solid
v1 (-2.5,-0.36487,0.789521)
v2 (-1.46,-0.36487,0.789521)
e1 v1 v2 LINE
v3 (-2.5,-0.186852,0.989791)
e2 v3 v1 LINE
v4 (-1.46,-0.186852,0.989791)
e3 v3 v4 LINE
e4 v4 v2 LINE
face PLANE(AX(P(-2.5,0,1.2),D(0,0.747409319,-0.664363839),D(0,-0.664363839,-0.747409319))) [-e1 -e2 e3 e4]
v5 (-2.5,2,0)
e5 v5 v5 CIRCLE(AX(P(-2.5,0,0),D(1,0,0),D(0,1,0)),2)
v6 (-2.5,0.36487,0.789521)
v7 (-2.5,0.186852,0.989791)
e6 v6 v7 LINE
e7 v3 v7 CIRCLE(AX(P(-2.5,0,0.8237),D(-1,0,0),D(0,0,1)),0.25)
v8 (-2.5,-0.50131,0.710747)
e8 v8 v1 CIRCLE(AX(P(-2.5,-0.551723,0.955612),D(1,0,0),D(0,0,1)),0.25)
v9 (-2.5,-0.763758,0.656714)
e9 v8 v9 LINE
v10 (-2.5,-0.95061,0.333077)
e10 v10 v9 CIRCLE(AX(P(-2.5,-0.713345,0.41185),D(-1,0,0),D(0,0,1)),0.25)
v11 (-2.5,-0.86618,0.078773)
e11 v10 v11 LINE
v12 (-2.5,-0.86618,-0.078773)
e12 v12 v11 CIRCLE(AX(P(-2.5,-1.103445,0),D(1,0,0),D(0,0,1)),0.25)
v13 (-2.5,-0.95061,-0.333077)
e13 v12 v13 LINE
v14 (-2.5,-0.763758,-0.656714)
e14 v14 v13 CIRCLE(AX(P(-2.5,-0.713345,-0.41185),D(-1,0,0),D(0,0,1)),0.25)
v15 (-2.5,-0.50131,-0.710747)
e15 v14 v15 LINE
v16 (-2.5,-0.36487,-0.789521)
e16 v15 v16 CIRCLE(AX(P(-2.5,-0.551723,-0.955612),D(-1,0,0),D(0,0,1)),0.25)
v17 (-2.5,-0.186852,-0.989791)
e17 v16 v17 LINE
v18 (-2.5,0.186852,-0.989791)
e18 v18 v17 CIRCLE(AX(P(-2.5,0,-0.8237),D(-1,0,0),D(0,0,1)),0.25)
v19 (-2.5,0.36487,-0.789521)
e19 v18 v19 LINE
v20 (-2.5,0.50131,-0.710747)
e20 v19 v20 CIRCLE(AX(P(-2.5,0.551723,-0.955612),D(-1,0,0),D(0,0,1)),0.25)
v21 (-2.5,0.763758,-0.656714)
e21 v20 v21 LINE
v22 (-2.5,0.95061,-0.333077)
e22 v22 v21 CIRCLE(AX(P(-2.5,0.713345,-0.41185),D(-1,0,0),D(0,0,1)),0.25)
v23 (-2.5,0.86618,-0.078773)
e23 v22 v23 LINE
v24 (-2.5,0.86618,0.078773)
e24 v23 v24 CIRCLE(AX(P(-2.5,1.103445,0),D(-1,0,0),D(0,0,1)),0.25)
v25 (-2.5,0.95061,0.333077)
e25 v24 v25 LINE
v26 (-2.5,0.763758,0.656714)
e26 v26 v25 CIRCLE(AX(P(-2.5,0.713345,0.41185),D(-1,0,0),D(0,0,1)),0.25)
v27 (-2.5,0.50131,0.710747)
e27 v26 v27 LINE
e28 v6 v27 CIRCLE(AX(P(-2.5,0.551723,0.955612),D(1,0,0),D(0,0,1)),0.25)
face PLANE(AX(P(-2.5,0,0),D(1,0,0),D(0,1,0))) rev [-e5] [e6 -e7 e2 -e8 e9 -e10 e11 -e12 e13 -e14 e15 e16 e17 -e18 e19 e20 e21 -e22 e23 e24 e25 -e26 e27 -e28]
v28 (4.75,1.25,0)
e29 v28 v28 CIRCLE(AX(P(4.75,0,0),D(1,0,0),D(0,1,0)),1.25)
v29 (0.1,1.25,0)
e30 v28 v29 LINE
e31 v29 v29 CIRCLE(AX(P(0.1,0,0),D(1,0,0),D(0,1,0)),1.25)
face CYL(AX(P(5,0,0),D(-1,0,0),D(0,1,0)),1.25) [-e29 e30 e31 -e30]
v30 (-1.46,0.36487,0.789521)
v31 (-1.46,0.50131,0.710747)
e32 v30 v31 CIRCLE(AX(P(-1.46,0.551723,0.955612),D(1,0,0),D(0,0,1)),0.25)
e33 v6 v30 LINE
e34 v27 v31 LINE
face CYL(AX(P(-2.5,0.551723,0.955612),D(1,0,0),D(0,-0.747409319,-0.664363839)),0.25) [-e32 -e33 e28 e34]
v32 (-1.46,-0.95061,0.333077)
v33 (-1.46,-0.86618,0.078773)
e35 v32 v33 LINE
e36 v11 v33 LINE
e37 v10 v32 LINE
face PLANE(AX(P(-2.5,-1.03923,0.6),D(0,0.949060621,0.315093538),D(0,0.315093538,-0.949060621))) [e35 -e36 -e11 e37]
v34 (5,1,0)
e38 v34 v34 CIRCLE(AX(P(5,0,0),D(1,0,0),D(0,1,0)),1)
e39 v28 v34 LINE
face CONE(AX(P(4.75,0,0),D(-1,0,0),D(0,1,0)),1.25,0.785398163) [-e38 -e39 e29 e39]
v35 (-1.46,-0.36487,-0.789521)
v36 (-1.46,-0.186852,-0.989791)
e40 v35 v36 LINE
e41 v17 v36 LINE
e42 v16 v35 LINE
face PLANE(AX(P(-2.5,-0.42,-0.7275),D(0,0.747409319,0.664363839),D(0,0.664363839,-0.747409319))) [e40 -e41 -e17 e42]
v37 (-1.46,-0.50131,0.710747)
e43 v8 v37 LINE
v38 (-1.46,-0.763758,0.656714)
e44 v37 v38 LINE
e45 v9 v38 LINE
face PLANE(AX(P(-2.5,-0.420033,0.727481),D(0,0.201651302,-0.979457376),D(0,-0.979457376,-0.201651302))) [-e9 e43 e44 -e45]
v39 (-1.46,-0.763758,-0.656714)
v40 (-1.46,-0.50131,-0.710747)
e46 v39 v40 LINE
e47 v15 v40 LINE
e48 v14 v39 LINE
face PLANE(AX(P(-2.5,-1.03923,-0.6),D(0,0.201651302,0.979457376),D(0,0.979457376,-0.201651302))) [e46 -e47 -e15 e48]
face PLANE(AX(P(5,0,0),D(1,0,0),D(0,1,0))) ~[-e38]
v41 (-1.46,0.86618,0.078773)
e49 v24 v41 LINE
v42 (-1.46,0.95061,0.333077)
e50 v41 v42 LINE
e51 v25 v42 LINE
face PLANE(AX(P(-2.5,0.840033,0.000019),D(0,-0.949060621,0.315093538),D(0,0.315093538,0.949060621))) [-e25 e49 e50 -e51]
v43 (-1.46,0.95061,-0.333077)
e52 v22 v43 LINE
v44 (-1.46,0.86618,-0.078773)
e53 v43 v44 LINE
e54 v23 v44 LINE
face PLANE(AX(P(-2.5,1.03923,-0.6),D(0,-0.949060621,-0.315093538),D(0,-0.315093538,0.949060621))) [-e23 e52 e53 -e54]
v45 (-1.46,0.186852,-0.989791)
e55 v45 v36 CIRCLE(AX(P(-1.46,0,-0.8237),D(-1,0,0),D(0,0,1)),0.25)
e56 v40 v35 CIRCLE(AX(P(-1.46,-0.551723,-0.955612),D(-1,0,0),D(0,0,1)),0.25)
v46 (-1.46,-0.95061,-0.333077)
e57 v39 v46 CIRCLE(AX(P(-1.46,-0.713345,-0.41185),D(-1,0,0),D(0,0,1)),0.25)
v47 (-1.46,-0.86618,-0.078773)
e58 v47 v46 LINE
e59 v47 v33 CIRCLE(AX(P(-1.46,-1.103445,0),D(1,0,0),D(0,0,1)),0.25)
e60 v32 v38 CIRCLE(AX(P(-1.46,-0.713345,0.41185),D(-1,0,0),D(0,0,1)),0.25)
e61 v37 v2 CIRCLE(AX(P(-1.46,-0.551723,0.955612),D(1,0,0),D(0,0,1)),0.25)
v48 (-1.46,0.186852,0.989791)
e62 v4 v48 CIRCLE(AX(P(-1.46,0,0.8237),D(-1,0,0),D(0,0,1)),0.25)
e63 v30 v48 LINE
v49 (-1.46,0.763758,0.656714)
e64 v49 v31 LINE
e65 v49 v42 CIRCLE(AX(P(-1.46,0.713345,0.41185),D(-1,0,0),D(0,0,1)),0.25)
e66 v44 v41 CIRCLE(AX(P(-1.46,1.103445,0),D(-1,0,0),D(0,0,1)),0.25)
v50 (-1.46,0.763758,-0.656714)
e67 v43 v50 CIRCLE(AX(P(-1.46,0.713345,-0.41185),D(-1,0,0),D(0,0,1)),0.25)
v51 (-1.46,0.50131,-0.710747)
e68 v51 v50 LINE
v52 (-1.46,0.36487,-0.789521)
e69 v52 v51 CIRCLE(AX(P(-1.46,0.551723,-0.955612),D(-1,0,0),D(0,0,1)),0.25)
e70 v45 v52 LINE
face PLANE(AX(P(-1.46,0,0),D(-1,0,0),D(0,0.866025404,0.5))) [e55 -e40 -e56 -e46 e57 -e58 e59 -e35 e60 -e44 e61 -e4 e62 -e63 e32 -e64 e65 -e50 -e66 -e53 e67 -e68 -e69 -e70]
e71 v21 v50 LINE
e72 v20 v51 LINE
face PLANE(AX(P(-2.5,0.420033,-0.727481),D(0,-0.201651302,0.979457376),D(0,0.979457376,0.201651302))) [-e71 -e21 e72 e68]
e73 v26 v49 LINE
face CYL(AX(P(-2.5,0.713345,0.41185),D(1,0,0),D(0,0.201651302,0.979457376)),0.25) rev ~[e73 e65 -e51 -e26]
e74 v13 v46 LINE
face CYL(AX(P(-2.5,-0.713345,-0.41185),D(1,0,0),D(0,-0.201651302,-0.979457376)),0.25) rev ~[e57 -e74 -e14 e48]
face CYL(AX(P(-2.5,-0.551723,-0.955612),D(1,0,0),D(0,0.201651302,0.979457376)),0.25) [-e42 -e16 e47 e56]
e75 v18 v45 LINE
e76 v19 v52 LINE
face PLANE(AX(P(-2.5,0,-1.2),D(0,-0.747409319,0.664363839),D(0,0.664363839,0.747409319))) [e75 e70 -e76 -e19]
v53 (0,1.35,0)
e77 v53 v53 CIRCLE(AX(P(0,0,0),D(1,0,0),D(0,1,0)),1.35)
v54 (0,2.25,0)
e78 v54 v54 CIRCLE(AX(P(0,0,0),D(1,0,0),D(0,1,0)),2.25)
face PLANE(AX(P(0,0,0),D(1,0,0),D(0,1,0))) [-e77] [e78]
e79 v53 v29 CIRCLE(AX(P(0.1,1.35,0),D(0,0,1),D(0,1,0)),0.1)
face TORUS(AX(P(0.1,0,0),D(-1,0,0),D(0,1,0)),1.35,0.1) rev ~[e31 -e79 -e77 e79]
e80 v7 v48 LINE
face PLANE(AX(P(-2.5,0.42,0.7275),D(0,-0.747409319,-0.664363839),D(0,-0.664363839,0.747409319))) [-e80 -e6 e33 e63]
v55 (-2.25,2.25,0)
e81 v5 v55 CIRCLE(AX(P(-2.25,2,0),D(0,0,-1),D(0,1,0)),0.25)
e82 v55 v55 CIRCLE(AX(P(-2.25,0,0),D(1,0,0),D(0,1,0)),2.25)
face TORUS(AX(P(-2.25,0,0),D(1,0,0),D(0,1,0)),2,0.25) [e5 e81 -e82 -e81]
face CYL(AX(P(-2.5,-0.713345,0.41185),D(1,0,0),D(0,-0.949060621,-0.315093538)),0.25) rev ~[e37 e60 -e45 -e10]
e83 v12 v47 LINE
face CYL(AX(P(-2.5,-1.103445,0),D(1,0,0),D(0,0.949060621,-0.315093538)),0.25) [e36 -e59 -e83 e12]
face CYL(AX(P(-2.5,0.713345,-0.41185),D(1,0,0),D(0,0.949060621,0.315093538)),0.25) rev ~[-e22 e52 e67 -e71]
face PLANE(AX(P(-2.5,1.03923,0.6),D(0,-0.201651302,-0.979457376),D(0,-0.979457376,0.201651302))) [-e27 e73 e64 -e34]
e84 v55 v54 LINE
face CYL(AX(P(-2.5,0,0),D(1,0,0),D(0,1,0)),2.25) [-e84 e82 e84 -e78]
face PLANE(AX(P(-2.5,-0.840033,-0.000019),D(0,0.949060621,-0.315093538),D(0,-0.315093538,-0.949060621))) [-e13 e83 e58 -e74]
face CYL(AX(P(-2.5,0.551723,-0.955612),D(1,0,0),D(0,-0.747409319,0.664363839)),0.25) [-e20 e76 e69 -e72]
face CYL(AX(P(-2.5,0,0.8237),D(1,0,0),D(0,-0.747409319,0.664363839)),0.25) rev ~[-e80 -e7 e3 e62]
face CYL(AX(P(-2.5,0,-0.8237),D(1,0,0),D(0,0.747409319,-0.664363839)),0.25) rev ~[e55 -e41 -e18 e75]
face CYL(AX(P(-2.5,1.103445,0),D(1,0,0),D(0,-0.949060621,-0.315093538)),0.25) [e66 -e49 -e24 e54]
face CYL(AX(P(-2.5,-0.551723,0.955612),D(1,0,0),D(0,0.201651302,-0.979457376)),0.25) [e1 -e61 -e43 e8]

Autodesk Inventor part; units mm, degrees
ref_plane "YZ Plane" through (0, 0, 0) normal (1, 0, 0) x (0, 1, 0)
ref_plane "XZ Plane" through (0, 0, 0) normal (0, 1, 0) x (-1, 0, 0)
ref_plane "XY Plane" through (0, 0, 0) normal (0, 0, 1) x (1, 0, 0)
sketch "Sketch1" plane through (0, 0, 0) normal (0, 0, 1) x (1, 0, 0)
  line L0 (0, 0) -> (5, 0)
  line L1 (5, 0) -> (5, 1.25)
  line L2 (5, 1.25) -> (0, 1.25)
  line L3 (0, 1.25) -> (0, 0)
  line L4 (0, 0) -> (-2.5, 0)
  line L5 (-2.5, 0) -> (-2.5, 2.25)
  line L6 (-2.5, 2.25) -> (0, 2.25)
  line L7 (0, 2.25) -> (0, 0)
  dimension "d0" = 2.5
  dimension "d1" = 4.5
  dimension "d2" = 2.5
  dimension "d3" = 5
revolve "Revolution1" add sketch "Sketch1" angle 360 about axis through (0, 0, 0) along (1, 0, 0)
thread "Thread1" size "M2.5x0.45" class "6g" standard "ISO Metric profile" length 5
sketch "Sketch2" plane through (-2.5, 0, 0) normal (-1, 0, 0) x (0, 0, 1)
  circle A0 centre (0, 0) radius 1.2 construction
  circle A1 centre (0, 0) radius 0.84 construction
  line L0 (-0.7275, -0.42) -> (-1.2, 0)
  line L1 (0, 0) -> (-0.7275, -0.42)
  line L2 (0, 0) -> (-0.7275, 0.42)
  line L3 (-3.15, 0) -> (3.15, 0) construction
  line L4 (-1.2, 0) -> (-0.7275, 0.42)
  dimension "d21" = 2.4
  dimension "d19" = 60
  dimension "d20" = 30
  dimension "d26" = 1.68
extrude "Extrusion1" cut sketch "Sketch2" against normal blind 1.04
pattern_circular "Circular Pattern1" count 6 over 360 about axis through (-2.5, 0, 0) along (1, 0, 0) of "Extrusion1"
fillet "Fillet2" radius 0.25 6 edges at (-1.98, 1.0392, -0.6) (-1.98, 1.0392, 0.6) (-1.98, 0, 1.2) (-1.98, -1.0392, 0.6) (-1.98, -1.0392, -0.6) (-1.98, 0, -1.2)
fillet "Fillet3" radius 0.25 6 edges at (-1.98, 0.84, 0) (-1.98, 0.42, -0.7275) (-1.98, -0.42, -0.7275) (-1.98, -0.84, 0) (-1.98, -0.42, 0.7275) (-1.98, 0.42, 0.7275)
fillet "Fillet4" radius 0.25 1 edges at (-2.5, -2.25, 0)
fillet "Fillet5" radius 0.1 1 edges at (0, -1.25, 0)
chamfer "Chamfer2" distance 0.25 angle 45 1 edges at (5, -1.25, 0)
equation "\"d0\" = d"
equation "\"d1\" = dk"
equation "\"d2\" = k"
equation "\"d3\" = l_"
equation "\"d6\" = b"
equation "\"d21\" = A_"
equation "\"d20\" = 0.5 * d19"
equation "\"d26\" = 0.7 * d21"
equation "\"d27\" = t"
equation "\"d32\" = v"
equation "\"d33\" = v"
equation "\"d34\" = v"
equation "\"d35\" = r"
equation "\"d36\" = v"
equation "\"A_\" = 2.4"
equation "\"d\" = 2.5"
equation "\"dk\" = 4.5"
equation "\"k\" = 2.5"
equation "\"l_\" = 5"
equation "\"lg\" = 0"
equation "\"t\" = 1.04"
equation "\"w\" = 0.55"
equation "\"v\" = 0.25"
equation "\"r\" = 0.1"
equation "\"da\" = 2.6"
equation "\"p\" = 0.45"
equation "\"ds_\" = d"
equation "\"GAL\" = 0.61345 * p"
equation "\"ls\" = 0"
equation "\"b\" = l_ - lg"
properties part number "Inbusschraube mit Innenrund ISO 14579 - M2,5x5-8.8" material "Stahl"
